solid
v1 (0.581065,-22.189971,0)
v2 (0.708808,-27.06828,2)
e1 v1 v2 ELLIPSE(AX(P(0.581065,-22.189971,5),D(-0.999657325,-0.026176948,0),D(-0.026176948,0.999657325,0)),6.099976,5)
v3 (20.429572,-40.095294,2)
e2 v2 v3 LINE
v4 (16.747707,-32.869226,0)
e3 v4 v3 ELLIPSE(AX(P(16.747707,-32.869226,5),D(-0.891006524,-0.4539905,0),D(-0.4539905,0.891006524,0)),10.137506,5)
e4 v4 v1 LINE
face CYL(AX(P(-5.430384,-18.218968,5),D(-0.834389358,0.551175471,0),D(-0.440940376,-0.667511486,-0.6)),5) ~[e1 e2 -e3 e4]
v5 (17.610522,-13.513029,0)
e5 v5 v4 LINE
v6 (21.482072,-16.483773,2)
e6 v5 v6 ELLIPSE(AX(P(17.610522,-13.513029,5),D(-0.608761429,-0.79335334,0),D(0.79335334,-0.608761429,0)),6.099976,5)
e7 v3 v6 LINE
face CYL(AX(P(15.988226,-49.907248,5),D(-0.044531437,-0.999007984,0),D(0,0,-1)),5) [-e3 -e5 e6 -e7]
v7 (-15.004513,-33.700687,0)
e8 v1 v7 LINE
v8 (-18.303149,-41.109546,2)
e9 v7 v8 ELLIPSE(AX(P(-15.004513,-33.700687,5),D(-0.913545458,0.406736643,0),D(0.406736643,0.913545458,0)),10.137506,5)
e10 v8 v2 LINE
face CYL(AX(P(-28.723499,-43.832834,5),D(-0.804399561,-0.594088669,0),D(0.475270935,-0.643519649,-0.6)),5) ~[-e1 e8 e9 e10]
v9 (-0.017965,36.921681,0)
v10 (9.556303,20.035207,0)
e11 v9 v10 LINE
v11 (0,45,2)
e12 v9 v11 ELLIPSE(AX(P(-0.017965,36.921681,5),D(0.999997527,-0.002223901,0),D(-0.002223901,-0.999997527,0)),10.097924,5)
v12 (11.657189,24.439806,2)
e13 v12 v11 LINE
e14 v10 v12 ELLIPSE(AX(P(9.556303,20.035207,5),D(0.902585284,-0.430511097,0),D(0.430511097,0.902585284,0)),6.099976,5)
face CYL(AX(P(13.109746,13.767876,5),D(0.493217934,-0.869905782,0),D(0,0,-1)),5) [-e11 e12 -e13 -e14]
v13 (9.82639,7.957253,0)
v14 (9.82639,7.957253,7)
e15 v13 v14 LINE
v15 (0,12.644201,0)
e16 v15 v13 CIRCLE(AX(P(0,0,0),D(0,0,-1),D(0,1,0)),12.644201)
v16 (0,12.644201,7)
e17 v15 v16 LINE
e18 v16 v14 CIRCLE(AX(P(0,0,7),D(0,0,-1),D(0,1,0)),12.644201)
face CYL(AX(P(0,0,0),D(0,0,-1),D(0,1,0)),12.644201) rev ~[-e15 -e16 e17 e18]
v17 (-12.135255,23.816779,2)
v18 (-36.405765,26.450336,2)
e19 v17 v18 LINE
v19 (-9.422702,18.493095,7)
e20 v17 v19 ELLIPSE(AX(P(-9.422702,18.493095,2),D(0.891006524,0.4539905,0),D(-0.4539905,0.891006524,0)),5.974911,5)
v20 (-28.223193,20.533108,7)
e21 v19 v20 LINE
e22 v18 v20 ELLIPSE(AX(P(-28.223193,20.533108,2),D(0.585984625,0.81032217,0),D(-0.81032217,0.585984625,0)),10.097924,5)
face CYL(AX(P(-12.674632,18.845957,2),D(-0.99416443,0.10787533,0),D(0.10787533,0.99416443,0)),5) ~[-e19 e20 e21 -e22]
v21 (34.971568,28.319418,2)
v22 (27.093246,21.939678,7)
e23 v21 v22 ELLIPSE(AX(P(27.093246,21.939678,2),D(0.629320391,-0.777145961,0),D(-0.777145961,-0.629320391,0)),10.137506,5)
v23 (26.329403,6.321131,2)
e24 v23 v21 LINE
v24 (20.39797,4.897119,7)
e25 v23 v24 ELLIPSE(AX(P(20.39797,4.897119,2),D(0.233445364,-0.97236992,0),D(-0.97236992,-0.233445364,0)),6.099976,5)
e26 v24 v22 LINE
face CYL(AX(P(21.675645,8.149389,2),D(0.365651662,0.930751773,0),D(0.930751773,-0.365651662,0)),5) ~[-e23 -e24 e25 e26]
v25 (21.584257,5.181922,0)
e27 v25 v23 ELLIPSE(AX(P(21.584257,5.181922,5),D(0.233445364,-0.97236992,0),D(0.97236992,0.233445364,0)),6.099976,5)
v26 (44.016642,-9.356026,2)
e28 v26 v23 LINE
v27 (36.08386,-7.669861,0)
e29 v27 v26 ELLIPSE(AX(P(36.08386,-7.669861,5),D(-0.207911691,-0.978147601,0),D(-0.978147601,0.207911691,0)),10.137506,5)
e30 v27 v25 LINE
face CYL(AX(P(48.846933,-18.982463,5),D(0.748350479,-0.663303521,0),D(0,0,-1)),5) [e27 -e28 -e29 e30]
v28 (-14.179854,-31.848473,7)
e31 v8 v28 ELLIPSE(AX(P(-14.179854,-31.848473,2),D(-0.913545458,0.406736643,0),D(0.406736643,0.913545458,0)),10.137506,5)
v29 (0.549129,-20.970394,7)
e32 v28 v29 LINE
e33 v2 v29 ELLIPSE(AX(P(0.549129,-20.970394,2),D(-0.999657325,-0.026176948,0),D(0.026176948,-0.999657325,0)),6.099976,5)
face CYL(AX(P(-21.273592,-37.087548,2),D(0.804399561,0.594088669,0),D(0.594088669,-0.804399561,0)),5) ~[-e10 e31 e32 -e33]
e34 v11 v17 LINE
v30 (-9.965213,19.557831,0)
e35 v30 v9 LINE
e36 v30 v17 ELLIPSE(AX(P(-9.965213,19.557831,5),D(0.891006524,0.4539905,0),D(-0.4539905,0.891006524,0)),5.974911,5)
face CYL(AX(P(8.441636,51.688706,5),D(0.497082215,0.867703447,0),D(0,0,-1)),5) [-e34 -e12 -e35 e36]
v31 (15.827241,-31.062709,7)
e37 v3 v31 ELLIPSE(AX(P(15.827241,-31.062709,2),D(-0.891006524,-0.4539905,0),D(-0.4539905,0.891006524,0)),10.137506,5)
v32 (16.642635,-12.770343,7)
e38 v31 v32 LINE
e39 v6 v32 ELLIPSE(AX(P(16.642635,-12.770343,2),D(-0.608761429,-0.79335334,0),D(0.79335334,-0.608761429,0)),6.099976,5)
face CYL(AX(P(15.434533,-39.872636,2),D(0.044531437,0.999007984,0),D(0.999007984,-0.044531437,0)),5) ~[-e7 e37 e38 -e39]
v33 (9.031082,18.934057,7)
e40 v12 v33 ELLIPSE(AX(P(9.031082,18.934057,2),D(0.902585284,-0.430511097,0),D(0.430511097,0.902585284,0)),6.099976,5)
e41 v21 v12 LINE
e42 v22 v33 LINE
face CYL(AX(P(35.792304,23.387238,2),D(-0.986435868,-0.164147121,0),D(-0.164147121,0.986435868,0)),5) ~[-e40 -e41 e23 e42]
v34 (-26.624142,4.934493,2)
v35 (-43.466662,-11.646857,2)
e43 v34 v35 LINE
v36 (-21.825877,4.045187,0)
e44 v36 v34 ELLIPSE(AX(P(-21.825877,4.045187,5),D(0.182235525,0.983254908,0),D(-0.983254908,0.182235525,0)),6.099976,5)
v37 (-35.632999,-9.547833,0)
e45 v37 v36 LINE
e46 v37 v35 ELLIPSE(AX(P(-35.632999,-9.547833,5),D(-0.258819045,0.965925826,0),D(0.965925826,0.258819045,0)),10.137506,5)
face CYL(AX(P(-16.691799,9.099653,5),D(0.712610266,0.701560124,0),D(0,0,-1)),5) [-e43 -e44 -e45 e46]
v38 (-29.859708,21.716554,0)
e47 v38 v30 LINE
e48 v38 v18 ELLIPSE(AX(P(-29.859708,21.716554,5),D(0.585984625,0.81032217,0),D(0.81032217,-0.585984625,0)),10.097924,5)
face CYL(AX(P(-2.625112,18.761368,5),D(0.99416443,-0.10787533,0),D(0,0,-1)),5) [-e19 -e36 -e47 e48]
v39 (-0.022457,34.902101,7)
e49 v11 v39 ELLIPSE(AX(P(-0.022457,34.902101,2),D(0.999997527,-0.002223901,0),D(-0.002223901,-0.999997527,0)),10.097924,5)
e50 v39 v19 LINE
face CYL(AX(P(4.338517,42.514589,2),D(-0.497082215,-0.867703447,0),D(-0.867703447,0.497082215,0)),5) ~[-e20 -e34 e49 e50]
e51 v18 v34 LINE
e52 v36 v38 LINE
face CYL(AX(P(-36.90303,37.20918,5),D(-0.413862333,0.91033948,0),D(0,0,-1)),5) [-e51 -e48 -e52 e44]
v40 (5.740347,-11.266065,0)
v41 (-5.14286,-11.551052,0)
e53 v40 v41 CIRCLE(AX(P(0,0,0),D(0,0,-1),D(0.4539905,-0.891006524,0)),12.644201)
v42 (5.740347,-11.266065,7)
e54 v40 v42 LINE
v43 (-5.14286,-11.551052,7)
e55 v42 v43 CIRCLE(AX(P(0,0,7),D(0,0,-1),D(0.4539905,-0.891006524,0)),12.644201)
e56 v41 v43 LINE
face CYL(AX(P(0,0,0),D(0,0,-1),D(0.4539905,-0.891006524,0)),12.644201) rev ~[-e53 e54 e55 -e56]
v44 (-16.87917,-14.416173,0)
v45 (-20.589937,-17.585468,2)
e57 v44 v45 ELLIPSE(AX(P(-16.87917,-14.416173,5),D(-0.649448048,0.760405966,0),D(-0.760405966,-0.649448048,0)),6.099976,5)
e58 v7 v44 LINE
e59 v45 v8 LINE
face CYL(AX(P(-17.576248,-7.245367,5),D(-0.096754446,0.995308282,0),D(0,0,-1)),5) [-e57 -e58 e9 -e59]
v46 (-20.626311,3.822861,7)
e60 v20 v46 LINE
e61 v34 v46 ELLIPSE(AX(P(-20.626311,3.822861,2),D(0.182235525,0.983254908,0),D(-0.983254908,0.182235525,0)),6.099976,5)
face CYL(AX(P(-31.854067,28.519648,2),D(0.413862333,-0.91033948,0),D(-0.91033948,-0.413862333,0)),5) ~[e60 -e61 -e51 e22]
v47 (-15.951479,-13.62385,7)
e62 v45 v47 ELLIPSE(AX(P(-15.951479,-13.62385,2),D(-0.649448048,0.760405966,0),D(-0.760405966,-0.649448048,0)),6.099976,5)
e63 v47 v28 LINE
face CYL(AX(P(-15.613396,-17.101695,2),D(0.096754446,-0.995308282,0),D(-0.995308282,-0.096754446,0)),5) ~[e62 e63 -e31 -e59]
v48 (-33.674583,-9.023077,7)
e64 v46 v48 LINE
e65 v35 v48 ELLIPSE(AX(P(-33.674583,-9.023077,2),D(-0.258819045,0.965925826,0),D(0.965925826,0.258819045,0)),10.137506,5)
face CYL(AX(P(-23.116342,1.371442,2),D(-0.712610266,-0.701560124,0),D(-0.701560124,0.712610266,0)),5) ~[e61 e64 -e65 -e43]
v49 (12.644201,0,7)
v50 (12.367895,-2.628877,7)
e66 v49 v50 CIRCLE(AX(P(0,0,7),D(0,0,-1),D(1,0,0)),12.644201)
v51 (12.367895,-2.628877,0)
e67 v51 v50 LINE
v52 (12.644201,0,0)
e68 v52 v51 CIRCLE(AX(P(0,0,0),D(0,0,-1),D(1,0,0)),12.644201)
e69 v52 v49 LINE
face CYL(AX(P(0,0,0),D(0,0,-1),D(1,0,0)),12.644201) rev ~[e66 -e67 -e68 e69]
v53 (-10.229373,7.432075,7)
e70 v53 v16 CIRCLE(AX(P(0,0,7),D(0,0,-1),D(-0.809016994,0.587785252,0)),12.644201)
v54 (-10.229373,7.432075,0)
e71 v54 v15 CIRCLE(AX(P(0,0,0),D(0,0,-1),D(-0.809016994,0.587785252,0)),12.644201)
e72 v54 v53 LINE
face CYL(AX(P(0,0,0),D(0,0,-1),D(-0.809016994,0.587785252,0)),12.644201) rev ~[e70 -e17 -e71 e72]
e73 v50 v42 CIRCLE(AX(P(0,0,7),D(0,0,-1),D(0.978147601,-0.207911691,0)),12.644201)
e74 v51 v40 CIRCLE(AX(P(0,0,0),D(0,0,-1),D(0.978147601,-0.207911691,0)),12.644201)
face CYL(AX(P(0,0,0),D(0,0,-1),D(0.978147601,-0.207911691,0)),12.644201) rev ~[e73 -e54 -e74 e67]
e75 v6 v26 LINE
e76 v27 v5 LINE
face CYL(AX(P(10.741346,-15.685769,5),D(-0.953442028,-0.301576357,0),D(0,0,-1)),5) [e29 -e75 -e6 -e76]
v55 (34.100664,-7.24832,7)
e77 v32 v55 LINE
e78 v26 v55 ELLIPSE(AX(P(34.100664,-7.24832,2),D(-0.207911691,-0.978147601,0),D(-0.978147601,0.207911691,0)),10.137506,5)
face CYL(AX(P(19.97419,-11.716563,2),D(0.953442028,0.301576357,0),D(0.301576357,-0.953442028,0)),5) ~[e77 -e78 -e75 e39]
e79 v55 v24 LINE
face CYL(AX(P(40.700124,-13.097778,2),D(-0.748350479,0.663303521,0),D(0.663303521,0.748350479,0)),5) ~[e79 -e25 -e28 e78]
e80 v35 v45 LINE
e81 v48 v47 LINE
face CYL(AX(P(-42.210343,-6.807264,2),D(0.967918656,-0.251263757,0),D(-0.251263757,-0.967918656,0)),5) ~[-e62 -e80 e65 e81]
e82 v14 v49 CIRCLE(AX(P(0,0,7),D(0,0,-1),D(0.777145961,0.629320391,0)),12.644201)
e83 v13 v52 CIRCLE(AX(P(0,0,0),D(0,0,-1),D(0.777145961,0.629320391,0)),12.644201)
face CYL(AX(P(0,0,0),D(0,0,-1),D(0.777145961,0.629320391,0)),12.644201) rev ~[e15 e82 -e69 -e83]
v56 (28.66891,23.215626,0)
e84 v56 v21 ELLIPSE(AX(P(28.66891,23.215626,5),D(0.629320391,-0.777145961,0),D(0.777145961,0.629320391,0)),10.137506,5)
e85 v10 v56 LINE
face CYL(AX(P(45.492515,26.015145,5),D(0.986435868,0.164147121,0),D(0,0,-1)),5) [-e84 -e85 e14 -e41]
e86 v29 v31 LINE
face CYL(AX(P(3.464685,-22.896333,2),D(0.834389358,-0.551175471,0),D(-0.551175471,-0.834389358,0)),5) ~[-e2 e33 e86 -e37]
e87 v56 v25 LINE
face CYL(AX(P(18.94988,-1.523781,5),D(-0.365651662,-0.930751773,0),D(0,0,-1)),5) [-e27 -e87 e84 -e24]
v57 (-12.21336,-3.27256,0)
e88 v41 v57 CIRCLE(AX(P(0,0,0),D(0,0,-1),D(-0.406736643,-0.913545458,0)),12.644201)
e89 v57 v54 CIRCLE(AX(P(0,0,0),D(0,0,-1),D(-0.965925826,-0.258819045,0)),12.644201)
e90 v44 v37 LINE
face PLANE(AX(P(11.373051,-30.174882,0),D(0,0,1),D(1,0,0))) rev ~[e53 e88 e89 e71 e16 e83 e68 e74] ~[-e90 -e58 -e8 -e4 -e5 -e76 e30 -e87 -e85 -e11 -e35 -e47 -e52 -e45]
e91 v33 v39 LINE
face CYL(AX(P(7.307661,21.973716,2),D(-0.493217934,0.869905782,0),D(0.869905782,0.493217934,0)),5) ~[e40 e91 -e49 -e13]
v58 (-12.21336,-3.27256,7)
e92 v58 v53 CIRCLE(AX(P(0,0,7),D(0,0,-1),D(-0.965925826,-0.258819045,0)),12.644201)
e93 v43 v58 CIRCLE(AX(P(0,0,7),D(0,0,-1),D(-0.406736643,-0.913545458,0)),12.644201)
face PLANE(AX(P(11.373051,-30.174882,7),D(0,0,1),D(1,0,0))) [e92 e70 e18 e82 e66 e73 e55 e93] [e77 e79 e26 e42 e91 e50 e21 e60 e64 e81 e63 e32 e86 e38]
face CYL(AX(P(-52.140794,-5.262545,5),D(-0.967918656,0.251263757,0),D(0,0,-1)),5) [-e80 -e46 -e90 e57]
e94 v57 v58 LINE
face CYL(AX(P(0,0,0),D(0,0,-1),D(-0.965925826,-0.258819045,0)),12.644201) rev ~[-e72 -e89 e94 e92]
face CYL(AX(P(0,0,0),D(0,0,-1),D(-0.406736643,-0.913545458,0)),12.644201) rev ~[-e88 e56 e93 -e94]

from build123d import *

# Parameters (mm, degrees)
F1_DEPTH      = 7
F2_R          = 5
F3_T4_DEPTH   = 43.6349666374
F3_T9_DEPTH   = 43.6349666374
F3_T14_DEPTH  = 44.4129734555
F3_T19_DEPTH  = 44.4129734555
F3_T24_DEPTH  = 43.6349666396
F3_T29_DEPTH  = 43.6349666396
F3_T34_DEPTH  = 43.6349666396
F3_T39_DEPTH  = 43.6349666396
F3_T44_DEPTH  = 43.6349666396
F3_T49_DEPTH  = 43.6349666396
F3_T54_DEPTH  = 43.6349666396
F3_T59_DEPTH  = 43.6349666418
F3_T64_DEPTH  = 43.6349666418
F3_T69_DEPTH  = 43.6349666396
F3_T75_DEPTH  = 43.6349666374
F3_T79_DEPTH  = 43.6349666374
F3_T86_DEPTH  = 44.4129734555
F3_T90_DEPTH  = 44.4129734555
F3_T97_DEPTH  = 43.6349666396
F3_T101_DEPTH = 43.6349666396
F3_T108_DEPTH = 43.6349666396
F3_T112_DEPTH = 43.6349666396
F3_T119_DEPTH = 43.6349666396
F3_T123_DEPTH = 43.6349666396
F3_T130_DEPTH = 43.6349666396
F3_T134_DEPTH = 43.6349666396
F3_T141_DEPTH = 43.6349666418
F3_T145_DEPTH = 43.6349666418


# Not quite as in the source:
# - a fillet or chamfer that OpenCascade refuses, or shapes differently, is made with other operations: its cross-section is extruded or revolved along the edge and cut away or added


with BuildPart() as f1:
    # F0 (on Top) → F1 (new body)
    with BuildSketch(Plane.XY):
        Polygon((20.4295724883, -40.0952935885), (10.2147862441, -20.0476467942), (0.70880785, -27.0682797275), align=None)
        Polygon((-18.3031489384, -41.1095455939), (-9.1515744692, -20.554772797), (-20.5899370405, -17.5854675412), align=None)
        Polygon((-20.5899370405, -17.5854675412), (-21.7333310915, -5.8234285148), (-43.466662183, -11.6468570296), align=None)
        Polygon((-12.1352549156, 23.8167787844), (0, 22.5), (0, 45), align=None)
        Polygon((-43.466662183, -11.6468570296), (-21.7333310915, -5.8234285148), (-26.62414231, 4.9344931078), align=None)
        Polygon((21.4820715071, -16.4837732251), (10.2147862441, -20.0476467942), (20.4295724883, -40.0952935885), align=None)
        Polygon((-26.62414231, 4.9344931078), (-18.2028823734, 13.2251681766), (-36.4057647469, 26.4503363532), align=None)
        with BuildLine():
            Line((10.2147862441, -20.0476467942), (7.7328428868, -15.176558687))
            ThreePointArc((7.7328428868, -15.176558687), (0.4458732697, -17.0272132106), (-6.927965583, -15.5604654677))
            Line((-6.927965583, -15.5604654677), (-9.1515744692, -20.554772797))
            Line((-9.1515744692, -20.554772797), (10.2147862441, -20.0476467942))
        make_face()
        Polygon((0, 45), (0, 22.5), (11.6571894205, 24.4398058675), align=None)
        Polygon((0.70880785, -27.0682797275), (-9.1515744692, -20.554772797), (-18.3031489384, -41.1095455939), align=None)
        Polygon((-18.2028823734, 13.2251681766), (0, 22.5), (-12.1352549156, 23.8167787844), align=None)
        with BuildLine():
            Line((7.7328428868, -15.176558687), (5.7403470363, -11.2660653986))
            ThreePointArc((5.7403470363, -11.2660653986), (0.3309865905, -12.63986794), (-5.1428597844, -11.5510521989))
            Line((-5.1428597844, -11.5510521989), (-6.927965583, -15.5604654677))
            ThreePointArc((-6.927965583, -15.5604654677), (0.4458732697, -17.0272132106), (7.7328428868, -15.176558687))
        make_face()
        Polygon((34.9715682614, 28.3194176024), (17.4857841307, 14.1597088012), (26.3294034315, 6.3211305052), align=None)
        Polygon((11.6571894205, 24.4398058675), (17.4857841307, 14.1597088012), (34.9715682614, 28.3194176024), align=None)
        Polygon((0, 22.5), (17.4857841307, 14.1597088012), (11.6571894205, 24.4398058675), align=None)
        with BuildLine():
            Line((16.6608370018, -3.5413702277), (12.3678946677, -2.6288771657))
            ThreePointArc((12.3678946677, -2.6288771657), (10.0313189335, -7.6973017427), (5.7403470363, -11.2660653986))
            Line((5.7403470363, -11.2660653986), (7.7328428868, -15.176558687))
            ThreePointArc((7.7328428868, -15.176558687), (13.5132271219, -10.3690638653), (16.6608370018, -3.5413702277))
        make_face()
        Polygon((44.016642033, -9.3560260868), (22.0083210165, -4.6780130434), (21.4820715071, -16.4837732251), align=None)
        Polygon((-20.5899370405, -17.5854675412), (-9.1515744692, -20.554772797), (-21.7333310915, -5.8234285148), align=None)
        Polygon((26.3294034315, 6.3211305052), (22.0083210165, -4.6780130434), (44.016642033, -9.3560260868), align=None)
        with BuildLine():
            ThreePointArc((-12.2133600976, -3.272559975), (-12.4324724808, 2.3042225757), (-10.2293733208, 7.4320747524))
            Line((-10.2293733208, 7.4320747524), (-13.7800269253, 10.0117755983))
            ThreePointArc((-13.7800269253, 10.0117755983), (-16.7478300145, 3.1040268196), (-16.4526629065, -4.4084777391))
            Line((-16.4526629065, -4.4084777391), (-12.2133600976, -3.272559975))
        make_face()
        with BuildLine():
            ThreePointArc((-16.4526629065, -4.4084777391), (-16.7478300145, 3.1040268196), (-13.7800269253, 10.0117755983))
            Line((-13.7800269253, 10.0117755983), (-18.2028823734, 13.2251681766))
            Line((-18.2028823734, 13.2251681766), (-21.7333310915, -5.8234285148))
            Line((-21.7333310915, -5.8234285148), (-16.4526629065, -4.4084777391))
        make_face()
        Polygon((0.70880785, -27.0682797275), (10.2147862441, -20.0476467942), (-9.1515744692, -20.554772797), align=None)
        with BuildLine():
            ThreePointArc((0, 12.6442007918), (5.4434687503, 11.4124695674), (9.82638958, 7.9572533883))
            Line((9.82638958, 7.9572533883), (13.2371660261, 10.7192456959))
            ThreePointArc((13.2371660261, 10.7192456959), (7.3329170413, 15.3737802884), (0, 17.0330500114))
            Line((0, 17.0330500114), (0, 12.6442007918))
        make_face()
        Polygon((-36.4057647469, 26.4503363532), (-18.2028823734, 13.2251681766), (-12.1352549156, 23.8167787844), align=None)
        with BuildLine():
            Line((22.0083210165, -4.6780130434), (16.6608370018, -3.5413702277))
            ThreePointArc((16.6608370018, -3.5413702277), (13.5132271219, -10.3690638653), (7.7328428868, -15.176558687))
            Line((7.7328428868, -15.176558687), (10.2147862441, -20.0476467942))
            Line((10.2147862441, -20.0476467942), (22.0083210165, -4.6780130434))
        make_face()
        with BuildLine():
            ThreePointArc((-10.2293733208, 7.4320747524), (-5.7403470363, 11.2660653986), (0, 12.6442007918))
            Line((0, 12.6442007918), (0, 17.0330500114))
            ThreePointArc((0, 17.0330500114), (-7.7328428868, 15.176558687), (-13.7800269253, 10.0117755983))
            Line((-13.7800269253, 10.0117755983), (-10.2293733208, 7.4320747524))
        make_face()
        with BuildLine():
            ThreePointArc((-13.7800269253, 10.0117755983), (-7.7328428868, 15.176558687), (0, 17.0330500114))
            Line((0, 17.0330500114), (0, 22.5))
            Line((0, 22.5), (-18.2028823734, 13.2251681766))
            Line((-18.2028823734, 13.2251681766), (-13.7800269253, 10.0117755983))
        make_face()
        with BuildLine():
            ThreePointArc((9.82638958, 7.9572533883), (11.9189482877, 4.2207209547), (12.6442007918, 0))
            ThreePointArc((12.6442007918, 0), (12.5749345369, -1.321678878), (12.3678946677, -2.6288771657))
            Line((12.3678946677, -2.6288771657), (16.6608370018, -3.5413702277))
            ThreePointArc((16.6608370018, -3.5413702277), (16.9397411812, -1.7804385425), (17.0330500114, 0))
            ThreePointArc((17.0330500114, 0), (16.0560596602, 5.6857489287), (13.2371660261, 10.7192456959))
            Line((13.2371660261, 10.7192456959), (9.82638958, 7.9572533883))
        make_face()
        with BuildLine():
            Line((-9.1515744692, -20.554772797), (-6.927965583, -15.5604654677))
            ThreePointArc((-6.927965583, -15.5604654677), (-12.952032841, -11.062081087), (-16.4526629065, -4.4084777391))
            Line((-16.4526629065, -4.4084777391), (-21.7333310915, -5.8234285148))
            Line((-21.7333310915, -5.8234285148), (-9.1515744692, -20.554772797))
        make_face()
        Polygon((-21.7333310915, -5.8234285148), (-18.2028823734, 13.2251681766), (-26.62414231, 4.9344931078), align=None)
        with BuildLine():
            Line((-6.927965583, -15.5604654677), (-5.1428597844, -11.5510521989))
            ThreePointArc((-5.1428597844, -11.5510521989), (-9.6147257123, -8.2117515269), (-12.2133600976, -3.272559975))
            Line((-12.2133600976, -3.272559975), (-16.4526629065, -4.4084777391))
            ThreePointArc((-16.4526629065, -4.4084777391), (-12.952032841, -11.062081087), (-6.927965583, -15.5604654677))
        make_face()
        with BuildLine():
            Line((17.4857841307, 14.1597088012), (13.2371660261, 10.7192456959))
            ThreePointArc((13.2371660261, 10.7192456959), (16.0560596602, 5.6857489287), (17.0330500114, 0))
            ThreePointArc((17.0330500114, 0), (16.9397411812, -1.7804385425), (16.6608370018, -3.5413702277))
            Line((16.6608370018, -3.5413702277), (22.0083210165, -4.6780130434))
            Line((22.0083210165, -4.6780130434), (17.4857841307, 14.1597088012))
        make_face()
        Polygon((21.4820715071, -16.4837732251), (22.0083210165, -4.6780130434), (10.2147862441, -20.0476467942), align=None)
        Polygon((26.3294034315, 6.3211305052), (17.4857841307, 14.1597088012), (22.0083210165, -4.6780130434), align=None)
        with BuildLine():
            ThreePointArc((0, 17.0330500114), (7.3329170413, 15.3737802884), (13.2371660261, 10.7192456959))
            Line((13.2371660261, 10.7192456959), (17.4857841307, 14.1597088012))
            Line((17.4857841307, 14.1597088012), (0, 22.5))
            Line((0, 22.5), (0, 17.0330500114))
        make_face()
    extrude(amount=F1_DEPTH)

    # F2
    f2_edges = [f1.edges().sort_by_distance(p)[0] for p in [
        (-24.27051, 25.133558, 7),
        (-6.067627, 34.408389, 7),
        (5.828595, 34.719903, 7),
        (23.314379, 26.379612, 7),
        (35.173023, -1.517448, 7),
        (32.749357, -12.9199, 7),
        (20.955822, -28.289533, 7),
        (10.56919, -33.581787, 7),
        (-8.797171, -34.088913, 7),
        (-19.446543, -29.347507, 7),
        (-32.0283, -14.616162, 7),
        (-35.045402, -3.356182, 7),
        (-31.514954, 15.692415, 7),
        (30.650486, 17.320274, 7),
    ]]
    fillet(f2_edges, radius=F2_R)

    # F3: fillet of radius 5 on 14 edges, made by hand


with BuildPart() as f3_tool2:
    # F3_s3 → F3_t4 (new body)
    with BuildSketch(Plane(origin=(48.4791406288, 8.0671350572, 0), x_dir=(0, 0, 1), z_dir=(-0.9864358685, -0.1641471213, 0))):
        with BuildLine():
            ThreePointArc((0, 18.1948070403), (0.527864045, 20.4308750178), (2, 22.1948070403))
            Line((2, 22.1948070403), (1.94, 22.2748070403))
            ThreePointArc((1.94, 22.2748070403), (1, 22.2948070403), (0, 22.2948070403))
            Line((0, 22.2948070403), (-0.1, 22.1948070403))
            Line((-0.1, 22.1948070403), (-0.1, 18.1948070403))
            Line((-0.1, 18.1948070403), (0, 18.1948070403))
        make_face()
    extrude(amount=F3_T4_DEPTH)

    split(bisect_by=Plane(origin=(19.3073909721, 10.946876879, 0), x_dir=(0, 0, 1), z_dir=(0.8699057819, 0.4932179342, 0)), keep=Keep.TOP)


with BuildPart() as f1_1:
    add(f1.part)

    # F3_t1: cut F3_tool2
    add(f3_tool2.part, mode=Mode.SUBTRACT)


with BuildPart() as f3_tool7:
    # F3_s8 → F3_t9 (new body)
    with BuildSketch(Plane(origin=(-2.7180222094, 4.7938711696, 0), x_dir=(0, 0, 1), z_dir=(-0.4932179342, 0.8699057819, 0))):
        with BuildLine():
            ThreePointArc((0, 18.1948070403), (0.527864045, 20.4308750178), (2, 22.1948070403))
            Line((2, 22.1948070403), (1.94, 22.2748070403))
            ThreePointArc((1.94, 22.2748070403), (1, 22.2948070403), (0, 22.2948070403))
            Line((0, 22.2948070403), (-0.1, 22.1948070403))
            Line((-0.1, 22.1948070403), (-0.1, 18.1948070403))
            Line((-0.1, 18.1948070403), (0, 18.1948070403))
        make_face()
    extrude(amount=F3_T9_DEPTH)

    split(bisect_by=Plane(origin=(-3.6432136829, 21.893753758, 0), x_dir=(0, 0, 1), z_dir=(-0.1641471213, 0.9864358685, 0)), keep=Keep.TOP)


with BuildPart() as f1_2:
    add(f1_1.part)

    # F3_t6: cut F3_tool7
    add(f3_tool7.part, mode=Mode.SUBTRACT)


with BuildPart() as f3_tool12:
    # F3_s13 → F3_t14 (new body)
    with BuildSketch(Plane(origin=(24.3802199512, 42.5579516955, 0), x_dir=(0, 0, 1), z_dir=(-0.4970822148, -0.8677034469, 0))):
        with BuildLine():
            ThreePointArc((0, 18.368699667), (0.527864045, 20.6047676445), (2, 22.368699667))
            Line((2, 22.368699667), (1.94, 22.448699667))
            ThreePointArc((1.94, 22.448699667), (1, 22.468699667), (0, 22.468699667))
            Line((0, 22.468699667), (-0.1, 22.368699667))
            Line((-0.1, 22.368699667), (-0.1, 18.368699667))
            Line((-0.1, 18.368699667), (0, 18.368699667))
        make_face()
    extrude(amount=F3_T14_DEPTH)

    split(bisect_by=Plane(origin=(2.4130308591, 22.2381655463, 0), x_dir=(0, 0, 1), z_dir=(0.10787533, 0.9941644296, 0)), keep=Keep.TOP)


with BuildPart() as f1_3:
    add(f1_2.part)

    # F3_t11: cut F3_tool12
    add(f3_tool12.part, mode=Mode.SUBTRACT)


with BuildPart() as f3_tool17:
    # F3_s18 → F3_t19 (new body)
    with BuildSketch(Plane(origin=(-4.6066414783, 0.4998599377, 0), x_dir=(0, 0, 1), z_dir=(-0.9941644296, 0.10787533, 0))):
        with BuildLine():
            ThreePointArc((0, 18.368699667), (0.527864045, 20.6047676445), (2, 22.368699667))
            Line((2, 22.368699667), (1.94, 22.448699667))
            ThreePointArc((1.94, 22.448699667), (1, 22.468699667), (0, 22.468699667))
            Line((0, 22.468699667), (-0.1, 22.368699667))
            Line((-0.1, 22.368699667), (-0.1, 18.368699667))
            Line((-0.1, 18.368699667), (0, 18.368699667))
        make_face()
    extrude(amount=F3_T19_DEPTH)

    split(bisect_by=Plane(origin=(-19.409397803, 11.1190827731, 0), x_dir=(0, 0, 1), z_dir=(-0.8677034469, 0.4970822148, 0)), keep=Keep.TOP)


with BuildPart() as f1_4:
    add(f1_3.part)

    # F3_t16: cut F3_tool17
    add(f3_tool17.part, mode=Mode.SUBTRACT)


with BuildPart() as f3_tool22:
    # F3_s23 → F3_t24 (new body)
    with BuildSketch(Plane(origin=(-20.3395789734, 44.7393257805, 0), x_dir=(0, 0, 1), z_dir=(0.4138623331, -0.9103394802, 0))):
        with BuildLine():
            ThreePointArc((0, 18.1948070409), (0.527864045, 20.4308750184), (2, 22.1948070409))
            Line((2, 22.1948070409), (1.94, 22.2748070409))
            ThreePointArc((1.94, 22.2748070409), (1, 22.2948070409), (0, 22.2948070409))
            Line((0, 22.2948070409), (-0.1, 22.1948070409))
            Line((-0.1, 22.1948070409), (-0.1, 18.1948070409))
            Line((-0.1, 18.1948070409), (0, 18.1948070409))
        make_face()
    extrude(amount=F3_T24_DEPTH)

    split(bisect_by=Plane(origin=(-15.5709915901, 15.8162473578, 0), x_dir=(0, 0, 1), z_dir=(-0.7015601245, 0.7126102664, 0)), keep=Keep.TOP)


with BuildPart() as f1_5:
    add(f1_4.part)

    # F3_t21: cut F3_tool22
    add(f3_tool22.part, mode=Mode.SUBTRACT)


with BuildPart() as f3_tool27:
    # F3_s28 → F3_t29 (new body)
    with BuildSketch(Plane(origin=(-3.927048056, -3.8661530052, 0), x_dir=(0, 0, 1), z_dir=(-0.7126102664, -0.7015601245, 0))):
        with BuildLine():
            ThreePointArc((0, 18.1948070409), (0.527864045, 20.4308750184), (2, 22.1948070409))
            Line((2, 22.1948070409), (1.94, 22.2748070409))
            ThreePointArc((1.94, 22.2748070409), (1, 22.2948070409), (0, 22.2948070409))
            Line((0, 22.2948070409), (-0.1, 22.1948070409))
            Line((-0.1, 22.1948070409), (-0.1, 18.1948070409))
            Line((-0.1, 18.1948070409), (0, 18.1948070409))
        make_face()
    extrude(amount=F3_T29_DEPTH)

    split(bisect_by=Plane(origin=(-20.2048091048, -9.1855946253, 0), x_dir=(0, 0, 1), z_dir=(-0.9103394802, -0.4138623331, 0)), keep=Keep.TOP)


with BuildPart() as f1_6:
    add(f1_5.part)

    # F3_t26: cut F3_tool27
    add(f3_tool27.part, mode=Mode.SUBTRACT)


with BuildPart() as f3_tool32:
    # F3_s33 → F3_t34 (new body)
    with BuildSketch(Plane(origin=(-47.5690981419, 12.3485483386, 0), x_dir=(0, 0, 1), z_dir=(0.9679186559, -0.2512637569, 0))):
        with BuildLine():
            ThreePointArc((0, 18.1948070409), (0.527864045, 20.4308750184), (2, 22.1948070409))
            Line((2, 22.1948070409), (1.94, 22.2748070409))
            ThreePointArc((1.94, 22.2748070409), (1, 22.2948070409), (0, 22.2948070409))
            Line((0, 22.2948070409), (-0.1, 22.1948070409))
            Line((-0.1, 22.1948070409), (-0.1, 18.1948070409))
            Line((-0.1, 18.1948070409), (0, 18.1948070409))
        make_face()
    extrude(amount=F3_T34_DEPTH)

    split(bisect_by=Plane(origin=(-22.090675276, -2.147446258, 0), x_dir=(0, 0, 1), z_dir=(-0.9953082825, -0.0967544459, 0)), keep=Keep.TOP)


with BuildPart() as f1_7:
    add(f1_6.part)

    # F3_t31: cut F3_tool32
    add(f3_tool32.part, mode=Mode.SUBTRACT)


with BuildPart() as f3_tool37:
    # F3_s38 → F3_t39 (new body)
    with BuildSketch(Plane(origin=(0.5331937761, -5.4849384583, 0), x_dir=(0, 0, 1), z_dir=(0.0967544459, -0.9953082825, 0))):
        with BuildLine():
            ThreePointArc((0, 18.1948070409), (0.527864045, 20.4308750184), (2, 22.1948070409))
            Line((2, 22.1948070409), (1.94, 22.2748070409))
            ThreePointArc((1.94, 22.2748070409), (1, 22.2948070409), (0, 22.2948070409))
            Line((0, 22.2948070409), (-0.1, 22.1948070409))
            Line((-0.1, 22.1948070409), (-0.1, 18.1948070409))
            Line((-0.1, 18.1948070409), (0, 18.1948070409))
        make_face()
    extrude(amount=F3_T39_DEPTH)

    split(bisect_by=Plane(origin=(-5.5767506003, -21.4827677994, 0), x_dir=(0, 0, 1), z_dir=(-0.2512637569, -0.9679186559, 0)), keep=Keep.TOP)


with BuildPart() as f1_8:
    add(f1_7.part)

    # F3_t36: cut F3_tool37
    add(f3_tool37.part, mode=Mode.SUBTRACT)


with BuildPart() as f3_tool42:
    # F3_s43 → F3_t44 (new body)
    with BuildSketch(Plane(origin=(-39.5328279158, -29.1969392418, 0), x_dir=(0, 0, 1), z_dir=(0.804399561, 0.5940886687, 0))):
        with BuildLine():
            ThreePointArc((2, 22.1948070409), (0.527864045, 20.4308750184), (0, 18.1948070409))
            Line((0, 18.1948070409), (-0.1, 18.1948070409))
            Line((-0.1, 18.1948070409), (-0.1, 22.1948070409))
            Line((-0.1, 22.1948070409), (0, 22.2948070409))
            ThreePointArc((0, 22.2948070409), (1, 22.2948070409), (1.94, 22.2748070409))
            Line((1.94, 22.2748070409), (2, 22.1948070409))
        make_face()
    extrude(amount=F3_T44_DEPTH)

    split(bisect_by=Plane(origin=(-12.2332332164, -18.5191107955, 0), x_dir=(0, 0, 1), z_dir=(-0.5511754706, -0.8343893579, 0)), keep=Keep.TOP)


with BuildPart() as f1_9:
    add(f1_8.part)

    # F3_t41: cut F3_tool42
    add(f3_tool42.part, mode=Mode.SUBTRACT)


with BuildPart() as f3_tool47:
    # F3_s48 → F3_t49 (new body)
    with BuildSketch(Plane(origin=(4.5981474874, -3.0374142256, 0), x_dir=(0, 0, 1), z_dir=(0.8343893579, -0.5511754706, 0))):
        with BuildLine():
            ThreePointArc((2, 22.1948070409), (0.527864045, 20.4308750184), (0, 18.1948070409))
            Line((0, 18.1948070409), (-0.1, 18.1948070409))
            Line((-0.1, 18.1948070409), (-0.1, 22.1948070409))
            Line((-0.1, 22.1948070409), (0, 22.2948070409))
            ThreePointArc((0, 22.2948070409), (1, 22.2948070409), (1.94, 22.2748070409))
            Line((1.94, 22.2748070409), (2, 22.1948070409))
        make_face()
    extrude(amount=F3_T49_DEPTH)

    split(bisect_by=Plane(origin=(13.1856833677, -17.8534930394, 0), x_dir=(0, 0, 1), z_dir=(0.5940886687, -0.804399561, 0)), keep=Keep.TOP)


with BuildPart() as f1_10:
    add(f1_9.part)

    # F3_t46: cut F3_tool47
    add(f3_tool47.part, mode=Mode.SUBTRACT)


with BuildPart() as f3_tool52:
    # F3_s53 → F3_t54 (new body)
    with BuildSketch(Plane(origin=(5.2542221736, 1.6619250417, 0), x_dir=(0, 0, 1), z_dir=(0.9534420281, 0.3015763571, 0))):
        with BuildLine():
            ThreePointArc((0, 18.1948070409), (0.527864045, 20.4308750184), (2, 22.1948070409))
            Line((2, 22.1948070409), (1.94, 22.2748070409))
            ThreePointArc((1.94, 22.2748070409), (1, 22.2948070409), (0, 22.2948070409))
            Line((0, 22.2948070409), (-0.1, 22.1948070409))
            Line((-0.1, 22.1948070409), (-0.1, 18.1948070409))
            Line((-0.1, 18.1948070409), (0, 18.1948070409))
        make_face()
    extrude(amount=F3_T54_DEPTH)

    split(bisect_by=Plane(origin=(22.1727894267, -0.9883666429, 0), x_dir=(0, 0, 1), z_dir=(0.9990079835, -0.0445314366, 0)), keep=Keep.TOP)


with BuildPart() as f1_11:
    add(f1_10.part)

    # F3_t51: cut F3_tool52
    add(f3_tool52.part, mode=Mode.SUBTRACT)


with BuildPart() as f3_tool57:
    # F3_s58 → F3_t59 (new body)
    with BuildSketch(Plane(origin=(36.7782531622, -32.5985557719, 0), x_dir=(0, 0, 1), z_dir=(-0.7483504787, 0.663303521, 0))):
        with BuildLine():
            ThreePointArc((0, 18.1948070415), (0.527864045, 20.430875019), (2, 22.1948070415))
            Line((2, 22.1948070415), (1.94, 22.2748070415))
            ThreePointArc((1.94, 22.2748070415), (1, 22.2948070415), (0, 22.2948070415))
            Line((0, 22.2948070415), (-0.1, 22.1948070415))
            Line((-0.1, 22.1948070415), (-0.1, 18.1948070415))
            Line((-0.1, 18.1948070415), (0, 18.1948070415))
        make_face()
    extrude(amount=F3_T59_DEPTH)

    split(bisect_by=Plane(origin=(20.6578559964, -8.1155680787, 0), x_dir=(0, 0, 1), z_dir=(0.9307517726, -0.3656516618, 0)), keep=Keep.TOP)


with BuildPart() as f1_12:
    add(f1_11.part)

    # F3_t56: cut F3_tool57
    add(f3_tool57.part, mode=Mode.SUBTRACT)


with BuildPart() as f3_tool62:
    # F3_s63 → F3_t64 (new body)
    with BuildSketch(Plane(origin=(2.0150308168, 5.1291808579, 0), x_dir=(0, 0, 1), z_dir=(0.3656516618, 0.9307517726, 0))):
        with BuildLine():
            ThreePointArc((0, 18.1948070415), (0.527864045, 20.430875019), (2, 22.1948070415))
            Line((2, 22.1948070415), (1.94, 22.2748070415))
            ThreePointArc((1.94, 22.2748070415), (1, 22.2948070415), (0, 22.2948070415))
            Line((0, 22.2948070415), (-0.1, 22.1948070415))
            Line((-0.1, 22.1948070415), (-0.1, 18.1948070415))
            Line((-0.1, 18.1948070415), (0, 18.1948070415))
        make_face()
    extrude(amount=F3_T64_DEPTH)

    split(bisect_by=Plane(origin=(14.7218936583, 16.6094944752, 0), x_dir=(0, 0, 1), z_dir=(0.663303521, 0.7483504787, 0)), keep=Keep.TOP)


with BuildPart() as f1_13:
    add(f1_12.part)

    # F3_t61: cut F3_tool62
    add(f3_tool62.part, mode=Mode.SUBTRACT)


with BuildPart() as f3_tool67:
    # F3_s68 → F3_t69 (new body)
    with BuildSketch(Plane(origin=(-2.1885313046, -49.0970067808, 0), x_dir=(0, 0, 1), z_dir=(0.0445314366, 0.9990079835, 0))):
        with BuildLine():
            ThreePointArc((0, 18.1948070409), (0.527864045, 20.4308750184), (2, 22.1948070409))
            Line((2, 22.1948070409), (1.94, 22.2748070409))
            ThreePointArc((1.94, 22.2748070409), (1, 22.2948070409), (0, 22.2948070409))
            Line((0, 22.2948070409), (-0.1, 22.1948070409))
            Line((-0.1, 22.1948070409), (-0.1, 18.1948070409))
            Line((-0.1, 18.1948070409), (0, 18.1948070409))
        make_face()
    extrude(amount=F3_T69_DEPTH)

    split(bisect_by=Plane(origin=(6.6934290529, -21.1614618374, 0), x_dir=(0, 0, 1), z_dir=(0.3015763571, -0.9534420281, 0)), keep=Keep.TOP)


with BuildPart() as f1_14:
    add(f1_13.part)

    # F3_t66: cut F3_tool67
    add(f3_tool67.part, mode=Mode.SUBTRACT)


with BuildPart() as f3_tool73:
    # F3_s74 → F3_t75 (new body)
    with BuildSketch(Plane(origin=(48.4791406288, 8.0671350572, 0), x_dir=(0, 0, 1), z_dir=(-0.9864358685, -0.1641471213, 0))):
        with BuildLine():
            ThreePointArc((0, 18.1948070403), (0.527864045, 20.4308750178), (2, 22.1948070403))
            Line((2, 22.1948070403), (1.94, 22.2748070403))
            ThreePointArc((1.94, 22.2748070403), (1, 22.2948070403), (0, 22.2948070403))
            Line((0, 22.2948070403), (-0.1, 22.1948070403))
            Line((-0.1, 22.1948070403), (-0.1, 18.1948070403))
            Line((-0.1, 18.1948070403), (0, 18.1948070403))
        make_face()
    extrude(amount=F3_T75_DEPTH)

    split(bisect_by=Plane(origin=(19.3073909721, 10.946876879, 0), x_dir=(0, 0, 1), z_dir=(-0.8699057819, -0.4932179342, 0)), keep=Keep.TOP)


with BuildPart() as f3_tool77:
    # F3_s78 → F3_t79 (new body)
    with BuildSketch(Plane(origin=(-2.7180222094, 4.7938711696, 0), x_dir=(0, 0, 1), z_dir=(-0.4932179342, 0.8699057819, 0))):
        with BuildLine():
            ThreePointArc((0, 18.1948070403), (0.527864045, 20.4308750178), (2, 22.1948070403))
            Line((2, 22.1948070403), (1.94, 22.2748070403))
            ThreePointArc((1.94, 22.2748070403), (1, 22.2948070403), (0, 22.2948070403))
            Line((0, 22.2948070403), (-0.1, 22.1948070403))
            Line((-0.1, 22.1948070403), (-0.1, 18.1948070403))
            Line((-0.1, 18.1948070403), (0, 18.1948070403))
        make_face()
    extrude(amount=F3_T79_DEPTH)

    split(bisect_by=Plane(origin=(-3.6432136829, 21.893753758, 0), x_dir=(0, 0, 1), z_dir=(0.1641471213, -0.9864358685, 0)), keep=Keep.TOP)


with BuildPart() as f3_tool73_1:
    add(f3_tool73.part)

    # F3_t81: intersect F3_tool77
    add(f3_tool77.part, mode=Mode.INTERSECT)


with BuildPart() as f1_15:
    add(f1_14.part)

    # F3_t71: cut F3_tool73
    add(f3_tool73_1.part, mode=Mode.SUBTRACT)


with BuildPart() as f3_tool84:
    # F3_s85 → F3_t86 (new body)
    with BuildSketch(Plane(origin=(24.3802199512, 42.5579516955, 0), x_dir=(0, 0, 1), z_dir=(-0.4970822148, -0.8677034469, 0))):
        with BuildLine():
            ThreePointArc((0, 18.368699667), (0.527864045, 20.6047676445), (2, 22.368699667))
            Line((2, 22.368699667), (1.94, 22.448699667))
            ThreePointArc((1.94, 22.448699667), (1, 22.468699667), (0, 22.468699667))
            Line((0, 22.468699667), (-0.1, 22.368699667))
            Line((-0.1, 22.368699667), (-0.1, 18.368699667))
            Line((-0.1, 18.368699667), (0, 18.368699667))
        make_face()
    extrude(amount=F3_T86_DEPTH)

    split(bisect_by=Plane(origin=(2.4130308591, 22.2381655463, 0), x_dir=(0, 0, 1), z_dir=(-0.10787533, -0.9941644296, 0)), keep=Keep.TOP)


with BuildPart() as f3_tool88:
    # F3_s89 → F3_t90 (new body)
    with BuildSketch(Plane(origin=(-4.6066414783, 0.4998599377, 0), x_dir=(0, 0, 1), z_dir=(-0.9941644296, 0.10787533, 0))):
        with BuildLine():
            ThreePointArc((0, 18.368699667), (0.527864045, 20.6047676445), (2, 22.368699667))
            Line((2, 22.368699667), (1.94, 22.448699667))
            ThreePointArc((1.94, 22.448699667), (1, 22.468699667), (0, 22.468699667))
            Line((0, 22.468699667), (-0.1, 22.368699667))
            Line((-0.1, 22.368699667), (-0.1, 18.368699667))
            Line((-0.1, 18.368699667), (0, 18.368699667))
        make_face()
    extrude(amount=F3_T90_DEPTH)

    split(bisect_by=Plane(origin=(-19.409397803, 11.1190827731, 0), x_dir=(0, 0, 1), z_dir=(0.8677034469, -0.4970822148, 0)), keep=Keep.TOP)


with BuildPart() as f3_tool84_1:
    add(f3_tool84.part)

    # F3_t92: intersect F3_tool88
    add(f3_tool88.part, mode=Mode.INTERSECT)


with BuildPart() as f1_16:
    add(f1_15.part)

    # F3_t82: cut F3_tool84
    add(f3_tool84_1.part, mode=Mode.SUBTRACT)


with BuildPart() as f3_tool95:
    # F3_s96 → F3_t97 (new body)
    with BuildSketch(Plane(origin=(-20.3395789734, 44.7393257805, 0), x_dir=(0, 0, 1), z_dir=(0.4138623331, -0.9103394802, 0))):
        with BuildLine():
            ThreePointArc((0, 18.1948070409), (0.527864045, 20.4308750184), (2, 22.1948070409))
            Line((2, 22.1948070409), (1.94, 22.2748070409))
            ThreePointArc((1.94, 22.2748070409), (1, 22.2948070409), (0, 22.2948070409))
            Line((0, 22.2948070409), (-0.1, 22.1948070409))
            Line((-0.1, 22.1948070409), (-0.1, 18.1948070409))
            Line((-0.1, 18.1948070409), (0, 18.1948070409))
        make_face()
    extrude(amount=F3_T97_DEPTH)

    split(bisect_by=Plane(origin=(-15.5709915901, 15.8162473578, 0), x_dir=(0, 0, 1), z_dir=(0.7015601245, -0.7126102664, 0)), keep=Keep.TOP)


with BuildPart() as f3_tool99:
    # F3_s100 → F3_t101 (new body)
    with BuildSketch(Plane(origin=(-3.927048056, -3.8661530052, 0), x_dir=(0, 0, 1), z_dir=(-0.7126102664, -0.7015601245, 0))):
        with BuildLine():
            ThreePointArc((0, 18.1948070409), (0.527864045, 20.4308750184), (2, 22.1948070409))
            Line((2, 22.1948070409), (1.94, 22.2748070409))
            ThreePointArc((1.94, 22.2748070409), (1, 22.2948070409), (0, 22.2948070409))
            Line((0, 22.2948070409), (-0.1, 22.1948070409))
            Line((-0.1, 22.1948070409), (-0.1, 18.1948070409))
            Line((-0.1, 18.1948070409), (0, 18.1948070409))
        make_face()
    extrude(amount=F3_T101_DEPTH)

    split(bisect_by=Plane(origin=(-20.2048091048, -9.1855946253, 0), x_dir=(0, 0, 1), z_dir=(0.9103394802, 0.4138623331, 0)), keep=Keep.TOP)


with BuildPart() as f3_tool95_1:
    add(f3_tool95.part)

    # F3_t103: intersect F3_tool99
    add(f3_tool99.part, mode=Mode.INTERSECT)


with BuildPart() as f1_17:
    add(f1_16.part)

    # F3_t93: cut F3_tool95
    add(f3_tool95_1.part, mode=Mode.SUBTRACT)


with BuildPart() as f3_tool106:
    # F3_s107 → F3_t108 (new body)
    with BuildSketch(Plane(origin=(-47.5690981419, 12.3485483386, 0), x_dir=(0, 0, 1), z_dir=(0.9679186559, -0.2512637569, 0))):
        with BuildLine():
            ThreePointArc((0, 18.1948070409), (0.527864045, 20.4308750184), (2, 22.1948070409))
            Line((2, 22.1948070409), (1.94, 22.2748070409))
            ThreePointArc((1.94, 22.2748070409), (1, 22.2948070409), (0, 22.2948070409))
            Line((0, 22.2948070409), (-0.1, 22.1948070409))
            Line((-0.1, 22.1948070409), (-0.1, 18.1948070409))
            Line((-0.1, 18.1948070409), (0, 18.1948070409))
        make_face()
    extrude(amount=F3_T108_DEPTH)

    split(bisect_by=Plane(origin=(-22.090675276, -2.147446258, 0), x_dir=(0, 0, 1), z_dir=(0.9953082825, 0.0967544459, 0)), keep=Keep.TOP)


with BuildPart() as f3_tool110:
    # F3_s111 → F3_t112 (new body)
    with BuildSketch(Plane(origin=(0.5331937761, -5.4849384583, 0), x_dir=(0, 0, 1), z_dir=(0.0967544459, -0.9953082825, 0))):
        with BuildLine():
            ThreePointArc((0, 18.1948070409), (0.527864045, 20.4308750184), (2, 22.1948070409))
            Line((2, 22.1948070409), (1.94, 22.2748070409))
            ThreePointArc((1.94, 22.2748070409), (1, 22.2948070409), (0, 22.2948070409))
            Line((0, 22.2948070409), (-0.1, 22.1948070409))
            Line((-0.1, 22.1948070409), (-0.1, 18.1948070409))
            Line((-0.1, 18.1948070409), (0, 18.1948070409))
        make_face()
    extrude(amount=F3_T112_DEPTH)

    split(bisect_by=Plane(origin=(-5.5767506003, -21.4827677994, 0), x_dir=(0, 0, 1), z_dir=(0.2512637569, 0.9679186559, 0)), keep=Keep.TOP)


with BuildPart() as f3_tool106_1:
    add(f3_tool106.part)

    # F3_t114: intersect F3_tool110
    add(f3_tool110.part, mode=Mode.INTERSECT)


with BuildPart() as f1_18:
    add(f1_17.part)

    # F3_t104: cut F3_tool106
    add(f3_tool106_1.part, mode=Mode.SUBTRACT)


with BuildPart() as f3_tool117:
    # F3_s118 → F3_t119 (new body)
    with BuildSketch(Plane(origin=(4.5981474874, -3.0374142256, 0), x_dir=(0, 0, 1), z_dir=(0.8343893579, -0.5511754706, 0))):
        with BuildLine():
            ThreePointArc((2, 22.1948070409), (0.527864045, 20.4308750184), (0, 18.1948070409))
            Line((0, 18.1948070409), (-0.1, 18.1948070409))
            Line((-0.1, 18.1948070409), (-0.1, 22.1948070409))
            Line((-0.1, 22.1948070409), (0, 22.2948070409))
            ThreePointArc((0, 22.2948070409), (1, 22.2948070409), (1.94, 22.2748070409))
            Line((1.94, 22.2748070409), (2, 22.1948070409))
        make_face()
    extrude(amount=F3_T119_DEPTH)

    split(bisect_by=Plane(origin=(13.1856833677, -17.8534930394, 0), x_dir=(0, 0, 1), z_dir=(-0.5940886687, 0.804399561, 0)), keep=Keep.TOP)


with BuildPart() as f3_tool121:
    # F3_s122 → F3_t123 (new body)
    with BuildSketch(Plane(origin=(-39.5328279158, -29.1969392418, 0), x_dir=(0, 0, 1), z_dir=(0.804399561, 0.5940886687, 0))):
        with BuildLine():
            ThreePointArc((2, 22.1948070409), (0.527864045, 20.4308750184), (0, 18.1948070409))
            Line((0, 18.1948070409), (-0.1, 18.1948070409))
            Line((-0.1, 18.1948070409), (-0.1, 22.1948070409))
            Line((-0.1, 22.1948070409), (0, 22.2948070409))
            ThreePointArc((0, 22.2948070409), (1, 22.2948070409), (1.94, 22.2748070409))
            Line((1.94, 22.2748070409), (2, 22.1948070409))
        make_face()
    extrude(amount=F3_T123_DEPTH)

    split(bisect_by=Plane(origin=(-12.2332332164, -18.5191107955, 0), x_dir=(0, 0, 1), z_dir=(0.5511754706, 0.8343893579, 0)), keep=Keep.TOP)


with BuildPart() as f3_tool117_1:
    add(f3_tool117.part)

    # F3_t125: intersect F3_tool121
    add(f3_tool121.part, mode=Mode.INTERSECT)


with BuildPart() as f1_19:
    add(f1_18.part)

    # F3_t115: cut F3_tool117
    add(f3_tool117_1.part, mode=Mode.SUBTRACT)


with BuildPart() as f3_tool128:
    # F3_s129 → F3_t130 (new body)
    with BuildSketch(Plane(origin=(-2.1885313046, -49.0970067808, 0), x_dir=(0, 0, 1), z_dir=(0.0445314366, 0.9990079835, 0))):
        with BuildLine():
            ThreePointArc((0, 18.1948070409), (0.527864045, 20.4308750184), (2, 22.1948070409))
            Line((2, 22.1948070409), (1.94, 22.2748070409))
            ThreePointArc((1.94, 22.2748070409), (1, 22.2948070409), (0, 22.2948070409))
            Line((0, 22.2948070409), (-0.1, 22.1948070409))
            Line((-0.1, 22.1948070409), (-0.1, 18.1948070409))
            Line((-0.1, 18.1948070409), (0, 18.1948070409))
        make_face()
    extrude(amount=F3_T130_DEPTH)

    split(bisect_by=Plane(origin=(6.6934290529, -21.1614618374, 0), x_dir=(0, 0, 1), z_dir=(-0.3015763571, 0.9534420281, 0)), keep=Keep.TOP)


with BuildPart() as f3_tool132:
    # F3_s133 → F3_t134 (new body)
    with BuildSketch(Plane(origin=(5.2542221736, 1.6619250417, 0), x_dir=(0, 0, 1), z_dir=(0.9534420281, 0.3015763571, 0))):
        with BuildLine():
            ThreePointArc((0, 18.1948070409), (0.527864045, 20.4308750184), (2, 22.1948070409))
            Line((2, 22.1948070409), (1.94, 22.2748070409))
            ThreePointArc((1.94, 22.2748070409), (1, 22.2948070409), (0, 22.2948070409))
            Line((0, 22.2948070409), (-0.1, 22.1948070409))
            Line((-0.1, 22.1948070409), (-0.1, 18.1948070409))
            Line((-0.1, 18.1948070409), (0, 18.1948070409))
        make_face()
    extrude(amount=F3_T134_DEPTH)

    split(bisect_by=Plane(origin=(22.1727894267, -0.9883666429, 0), x_dir=(0, 0, 1), z_dir=(-0.9990079835, 0.0445314366, 0)), keep=Keep.TOP)


with BuildPart() as f3_tool128_1:
    add(f3_tool128.part)

    # F3_t136: intersect F3_tool132
    add(f3_tool132.part, mode=Mode.INTERSECT)


with BuildPart() as f1_20:
    add(f1_19.part)

    # F3_t126: cut F3_tool128
    add(f3_tool128_1.part, mode=Mode.SUBTRACT)


with BuildPart() as f3_tool139:
    # F3_s140 → F3_t141 (new body)
    with BuildSketch(Plane(origin=(36.7782531622, -32.5985557719, 0), x_dir=(0, 0, 1), z_dir=(-0.7483504787, 0.663303521, 0))):
        with BuildLine():
            ThreePointArc((0, 18.1948070415), (0.527864045, 20.430875019), (2, 22.1948070415))
            Line((2, 22.1948070415), (1.94, 22.2748070415))
            ThreePointArc((1.94, 22.2748070415), (1, 22.2948070415), (0, 22.2948070415))
            Line((0, 22.2948070415), (-0.1, 22.1948070415))
            Line((-0.1, 22.1948070415), (-0.1, 18.1948070415))
            Line((-0.1, 18.1948070415), (0, 18.1948070415))
        make_face()
    extrude(amount=F3_T141_DEPTH)

    split(bisect_by=Plane(origin=(20.6578559964, -8.1155680787, 0), x_dir=(0, 0, 1), z_dir=(-0.9307517726, 0.3656516618, 0)), keep=Keep.TOP)


with BuildPart() as f3_tool143:
    # F3_s144 → F3_t145 (new body)
    with BuildSketch(Plane(origin=(2.0150308168, 5.1291808579, 0), x_dir=(0, 0, 1), z_dir=(0.3656516618, 0.9307517726, 0))):
        with BuildLine():
            ThreePointArc((0, 18.1948070415), (0.527864045, 20.430875019), (2, 22.1948070415))
            Line((2, 22.1948070415), (1.94, 22.2748070415))
            ThreePointArc((1.94, 22.2748070415), (1, 22.2948070415), (0, 22.2948070415))
            Line((0, 22.2948070415), (-0.1, 22.1948070415))
            Line((-0.1, 22.1948070415), (-0.1, 18.1948070415))
            Line((-0.1, 18.1948070415), (0, 18.1948070415))
        make_face()
    extrude(amount=F3_T145_DEPTH)

    split(bisect_by=Plane(origin=(14.7218936583, 16.6094944752, 0), x_dir=(0, 0, 1), z_dir=(-0.663303521, -0.7483504787, 0)), keep=Keep.TOP)


with BuildPart() as f3_tool139_1:
    add(f3_tool139.part)

    # F3_t147: intersect F3_tool143
    add(f3_tool143.part, mode=Mode.INTERSECT)


with BuildPart() as f1_21:
    add(f1_20.part)

    # F3_t137: cut F3_tool139
    add(f3_tool139_1.part, mode=Mode.SUBTRACT)


solid = f1_21.part
